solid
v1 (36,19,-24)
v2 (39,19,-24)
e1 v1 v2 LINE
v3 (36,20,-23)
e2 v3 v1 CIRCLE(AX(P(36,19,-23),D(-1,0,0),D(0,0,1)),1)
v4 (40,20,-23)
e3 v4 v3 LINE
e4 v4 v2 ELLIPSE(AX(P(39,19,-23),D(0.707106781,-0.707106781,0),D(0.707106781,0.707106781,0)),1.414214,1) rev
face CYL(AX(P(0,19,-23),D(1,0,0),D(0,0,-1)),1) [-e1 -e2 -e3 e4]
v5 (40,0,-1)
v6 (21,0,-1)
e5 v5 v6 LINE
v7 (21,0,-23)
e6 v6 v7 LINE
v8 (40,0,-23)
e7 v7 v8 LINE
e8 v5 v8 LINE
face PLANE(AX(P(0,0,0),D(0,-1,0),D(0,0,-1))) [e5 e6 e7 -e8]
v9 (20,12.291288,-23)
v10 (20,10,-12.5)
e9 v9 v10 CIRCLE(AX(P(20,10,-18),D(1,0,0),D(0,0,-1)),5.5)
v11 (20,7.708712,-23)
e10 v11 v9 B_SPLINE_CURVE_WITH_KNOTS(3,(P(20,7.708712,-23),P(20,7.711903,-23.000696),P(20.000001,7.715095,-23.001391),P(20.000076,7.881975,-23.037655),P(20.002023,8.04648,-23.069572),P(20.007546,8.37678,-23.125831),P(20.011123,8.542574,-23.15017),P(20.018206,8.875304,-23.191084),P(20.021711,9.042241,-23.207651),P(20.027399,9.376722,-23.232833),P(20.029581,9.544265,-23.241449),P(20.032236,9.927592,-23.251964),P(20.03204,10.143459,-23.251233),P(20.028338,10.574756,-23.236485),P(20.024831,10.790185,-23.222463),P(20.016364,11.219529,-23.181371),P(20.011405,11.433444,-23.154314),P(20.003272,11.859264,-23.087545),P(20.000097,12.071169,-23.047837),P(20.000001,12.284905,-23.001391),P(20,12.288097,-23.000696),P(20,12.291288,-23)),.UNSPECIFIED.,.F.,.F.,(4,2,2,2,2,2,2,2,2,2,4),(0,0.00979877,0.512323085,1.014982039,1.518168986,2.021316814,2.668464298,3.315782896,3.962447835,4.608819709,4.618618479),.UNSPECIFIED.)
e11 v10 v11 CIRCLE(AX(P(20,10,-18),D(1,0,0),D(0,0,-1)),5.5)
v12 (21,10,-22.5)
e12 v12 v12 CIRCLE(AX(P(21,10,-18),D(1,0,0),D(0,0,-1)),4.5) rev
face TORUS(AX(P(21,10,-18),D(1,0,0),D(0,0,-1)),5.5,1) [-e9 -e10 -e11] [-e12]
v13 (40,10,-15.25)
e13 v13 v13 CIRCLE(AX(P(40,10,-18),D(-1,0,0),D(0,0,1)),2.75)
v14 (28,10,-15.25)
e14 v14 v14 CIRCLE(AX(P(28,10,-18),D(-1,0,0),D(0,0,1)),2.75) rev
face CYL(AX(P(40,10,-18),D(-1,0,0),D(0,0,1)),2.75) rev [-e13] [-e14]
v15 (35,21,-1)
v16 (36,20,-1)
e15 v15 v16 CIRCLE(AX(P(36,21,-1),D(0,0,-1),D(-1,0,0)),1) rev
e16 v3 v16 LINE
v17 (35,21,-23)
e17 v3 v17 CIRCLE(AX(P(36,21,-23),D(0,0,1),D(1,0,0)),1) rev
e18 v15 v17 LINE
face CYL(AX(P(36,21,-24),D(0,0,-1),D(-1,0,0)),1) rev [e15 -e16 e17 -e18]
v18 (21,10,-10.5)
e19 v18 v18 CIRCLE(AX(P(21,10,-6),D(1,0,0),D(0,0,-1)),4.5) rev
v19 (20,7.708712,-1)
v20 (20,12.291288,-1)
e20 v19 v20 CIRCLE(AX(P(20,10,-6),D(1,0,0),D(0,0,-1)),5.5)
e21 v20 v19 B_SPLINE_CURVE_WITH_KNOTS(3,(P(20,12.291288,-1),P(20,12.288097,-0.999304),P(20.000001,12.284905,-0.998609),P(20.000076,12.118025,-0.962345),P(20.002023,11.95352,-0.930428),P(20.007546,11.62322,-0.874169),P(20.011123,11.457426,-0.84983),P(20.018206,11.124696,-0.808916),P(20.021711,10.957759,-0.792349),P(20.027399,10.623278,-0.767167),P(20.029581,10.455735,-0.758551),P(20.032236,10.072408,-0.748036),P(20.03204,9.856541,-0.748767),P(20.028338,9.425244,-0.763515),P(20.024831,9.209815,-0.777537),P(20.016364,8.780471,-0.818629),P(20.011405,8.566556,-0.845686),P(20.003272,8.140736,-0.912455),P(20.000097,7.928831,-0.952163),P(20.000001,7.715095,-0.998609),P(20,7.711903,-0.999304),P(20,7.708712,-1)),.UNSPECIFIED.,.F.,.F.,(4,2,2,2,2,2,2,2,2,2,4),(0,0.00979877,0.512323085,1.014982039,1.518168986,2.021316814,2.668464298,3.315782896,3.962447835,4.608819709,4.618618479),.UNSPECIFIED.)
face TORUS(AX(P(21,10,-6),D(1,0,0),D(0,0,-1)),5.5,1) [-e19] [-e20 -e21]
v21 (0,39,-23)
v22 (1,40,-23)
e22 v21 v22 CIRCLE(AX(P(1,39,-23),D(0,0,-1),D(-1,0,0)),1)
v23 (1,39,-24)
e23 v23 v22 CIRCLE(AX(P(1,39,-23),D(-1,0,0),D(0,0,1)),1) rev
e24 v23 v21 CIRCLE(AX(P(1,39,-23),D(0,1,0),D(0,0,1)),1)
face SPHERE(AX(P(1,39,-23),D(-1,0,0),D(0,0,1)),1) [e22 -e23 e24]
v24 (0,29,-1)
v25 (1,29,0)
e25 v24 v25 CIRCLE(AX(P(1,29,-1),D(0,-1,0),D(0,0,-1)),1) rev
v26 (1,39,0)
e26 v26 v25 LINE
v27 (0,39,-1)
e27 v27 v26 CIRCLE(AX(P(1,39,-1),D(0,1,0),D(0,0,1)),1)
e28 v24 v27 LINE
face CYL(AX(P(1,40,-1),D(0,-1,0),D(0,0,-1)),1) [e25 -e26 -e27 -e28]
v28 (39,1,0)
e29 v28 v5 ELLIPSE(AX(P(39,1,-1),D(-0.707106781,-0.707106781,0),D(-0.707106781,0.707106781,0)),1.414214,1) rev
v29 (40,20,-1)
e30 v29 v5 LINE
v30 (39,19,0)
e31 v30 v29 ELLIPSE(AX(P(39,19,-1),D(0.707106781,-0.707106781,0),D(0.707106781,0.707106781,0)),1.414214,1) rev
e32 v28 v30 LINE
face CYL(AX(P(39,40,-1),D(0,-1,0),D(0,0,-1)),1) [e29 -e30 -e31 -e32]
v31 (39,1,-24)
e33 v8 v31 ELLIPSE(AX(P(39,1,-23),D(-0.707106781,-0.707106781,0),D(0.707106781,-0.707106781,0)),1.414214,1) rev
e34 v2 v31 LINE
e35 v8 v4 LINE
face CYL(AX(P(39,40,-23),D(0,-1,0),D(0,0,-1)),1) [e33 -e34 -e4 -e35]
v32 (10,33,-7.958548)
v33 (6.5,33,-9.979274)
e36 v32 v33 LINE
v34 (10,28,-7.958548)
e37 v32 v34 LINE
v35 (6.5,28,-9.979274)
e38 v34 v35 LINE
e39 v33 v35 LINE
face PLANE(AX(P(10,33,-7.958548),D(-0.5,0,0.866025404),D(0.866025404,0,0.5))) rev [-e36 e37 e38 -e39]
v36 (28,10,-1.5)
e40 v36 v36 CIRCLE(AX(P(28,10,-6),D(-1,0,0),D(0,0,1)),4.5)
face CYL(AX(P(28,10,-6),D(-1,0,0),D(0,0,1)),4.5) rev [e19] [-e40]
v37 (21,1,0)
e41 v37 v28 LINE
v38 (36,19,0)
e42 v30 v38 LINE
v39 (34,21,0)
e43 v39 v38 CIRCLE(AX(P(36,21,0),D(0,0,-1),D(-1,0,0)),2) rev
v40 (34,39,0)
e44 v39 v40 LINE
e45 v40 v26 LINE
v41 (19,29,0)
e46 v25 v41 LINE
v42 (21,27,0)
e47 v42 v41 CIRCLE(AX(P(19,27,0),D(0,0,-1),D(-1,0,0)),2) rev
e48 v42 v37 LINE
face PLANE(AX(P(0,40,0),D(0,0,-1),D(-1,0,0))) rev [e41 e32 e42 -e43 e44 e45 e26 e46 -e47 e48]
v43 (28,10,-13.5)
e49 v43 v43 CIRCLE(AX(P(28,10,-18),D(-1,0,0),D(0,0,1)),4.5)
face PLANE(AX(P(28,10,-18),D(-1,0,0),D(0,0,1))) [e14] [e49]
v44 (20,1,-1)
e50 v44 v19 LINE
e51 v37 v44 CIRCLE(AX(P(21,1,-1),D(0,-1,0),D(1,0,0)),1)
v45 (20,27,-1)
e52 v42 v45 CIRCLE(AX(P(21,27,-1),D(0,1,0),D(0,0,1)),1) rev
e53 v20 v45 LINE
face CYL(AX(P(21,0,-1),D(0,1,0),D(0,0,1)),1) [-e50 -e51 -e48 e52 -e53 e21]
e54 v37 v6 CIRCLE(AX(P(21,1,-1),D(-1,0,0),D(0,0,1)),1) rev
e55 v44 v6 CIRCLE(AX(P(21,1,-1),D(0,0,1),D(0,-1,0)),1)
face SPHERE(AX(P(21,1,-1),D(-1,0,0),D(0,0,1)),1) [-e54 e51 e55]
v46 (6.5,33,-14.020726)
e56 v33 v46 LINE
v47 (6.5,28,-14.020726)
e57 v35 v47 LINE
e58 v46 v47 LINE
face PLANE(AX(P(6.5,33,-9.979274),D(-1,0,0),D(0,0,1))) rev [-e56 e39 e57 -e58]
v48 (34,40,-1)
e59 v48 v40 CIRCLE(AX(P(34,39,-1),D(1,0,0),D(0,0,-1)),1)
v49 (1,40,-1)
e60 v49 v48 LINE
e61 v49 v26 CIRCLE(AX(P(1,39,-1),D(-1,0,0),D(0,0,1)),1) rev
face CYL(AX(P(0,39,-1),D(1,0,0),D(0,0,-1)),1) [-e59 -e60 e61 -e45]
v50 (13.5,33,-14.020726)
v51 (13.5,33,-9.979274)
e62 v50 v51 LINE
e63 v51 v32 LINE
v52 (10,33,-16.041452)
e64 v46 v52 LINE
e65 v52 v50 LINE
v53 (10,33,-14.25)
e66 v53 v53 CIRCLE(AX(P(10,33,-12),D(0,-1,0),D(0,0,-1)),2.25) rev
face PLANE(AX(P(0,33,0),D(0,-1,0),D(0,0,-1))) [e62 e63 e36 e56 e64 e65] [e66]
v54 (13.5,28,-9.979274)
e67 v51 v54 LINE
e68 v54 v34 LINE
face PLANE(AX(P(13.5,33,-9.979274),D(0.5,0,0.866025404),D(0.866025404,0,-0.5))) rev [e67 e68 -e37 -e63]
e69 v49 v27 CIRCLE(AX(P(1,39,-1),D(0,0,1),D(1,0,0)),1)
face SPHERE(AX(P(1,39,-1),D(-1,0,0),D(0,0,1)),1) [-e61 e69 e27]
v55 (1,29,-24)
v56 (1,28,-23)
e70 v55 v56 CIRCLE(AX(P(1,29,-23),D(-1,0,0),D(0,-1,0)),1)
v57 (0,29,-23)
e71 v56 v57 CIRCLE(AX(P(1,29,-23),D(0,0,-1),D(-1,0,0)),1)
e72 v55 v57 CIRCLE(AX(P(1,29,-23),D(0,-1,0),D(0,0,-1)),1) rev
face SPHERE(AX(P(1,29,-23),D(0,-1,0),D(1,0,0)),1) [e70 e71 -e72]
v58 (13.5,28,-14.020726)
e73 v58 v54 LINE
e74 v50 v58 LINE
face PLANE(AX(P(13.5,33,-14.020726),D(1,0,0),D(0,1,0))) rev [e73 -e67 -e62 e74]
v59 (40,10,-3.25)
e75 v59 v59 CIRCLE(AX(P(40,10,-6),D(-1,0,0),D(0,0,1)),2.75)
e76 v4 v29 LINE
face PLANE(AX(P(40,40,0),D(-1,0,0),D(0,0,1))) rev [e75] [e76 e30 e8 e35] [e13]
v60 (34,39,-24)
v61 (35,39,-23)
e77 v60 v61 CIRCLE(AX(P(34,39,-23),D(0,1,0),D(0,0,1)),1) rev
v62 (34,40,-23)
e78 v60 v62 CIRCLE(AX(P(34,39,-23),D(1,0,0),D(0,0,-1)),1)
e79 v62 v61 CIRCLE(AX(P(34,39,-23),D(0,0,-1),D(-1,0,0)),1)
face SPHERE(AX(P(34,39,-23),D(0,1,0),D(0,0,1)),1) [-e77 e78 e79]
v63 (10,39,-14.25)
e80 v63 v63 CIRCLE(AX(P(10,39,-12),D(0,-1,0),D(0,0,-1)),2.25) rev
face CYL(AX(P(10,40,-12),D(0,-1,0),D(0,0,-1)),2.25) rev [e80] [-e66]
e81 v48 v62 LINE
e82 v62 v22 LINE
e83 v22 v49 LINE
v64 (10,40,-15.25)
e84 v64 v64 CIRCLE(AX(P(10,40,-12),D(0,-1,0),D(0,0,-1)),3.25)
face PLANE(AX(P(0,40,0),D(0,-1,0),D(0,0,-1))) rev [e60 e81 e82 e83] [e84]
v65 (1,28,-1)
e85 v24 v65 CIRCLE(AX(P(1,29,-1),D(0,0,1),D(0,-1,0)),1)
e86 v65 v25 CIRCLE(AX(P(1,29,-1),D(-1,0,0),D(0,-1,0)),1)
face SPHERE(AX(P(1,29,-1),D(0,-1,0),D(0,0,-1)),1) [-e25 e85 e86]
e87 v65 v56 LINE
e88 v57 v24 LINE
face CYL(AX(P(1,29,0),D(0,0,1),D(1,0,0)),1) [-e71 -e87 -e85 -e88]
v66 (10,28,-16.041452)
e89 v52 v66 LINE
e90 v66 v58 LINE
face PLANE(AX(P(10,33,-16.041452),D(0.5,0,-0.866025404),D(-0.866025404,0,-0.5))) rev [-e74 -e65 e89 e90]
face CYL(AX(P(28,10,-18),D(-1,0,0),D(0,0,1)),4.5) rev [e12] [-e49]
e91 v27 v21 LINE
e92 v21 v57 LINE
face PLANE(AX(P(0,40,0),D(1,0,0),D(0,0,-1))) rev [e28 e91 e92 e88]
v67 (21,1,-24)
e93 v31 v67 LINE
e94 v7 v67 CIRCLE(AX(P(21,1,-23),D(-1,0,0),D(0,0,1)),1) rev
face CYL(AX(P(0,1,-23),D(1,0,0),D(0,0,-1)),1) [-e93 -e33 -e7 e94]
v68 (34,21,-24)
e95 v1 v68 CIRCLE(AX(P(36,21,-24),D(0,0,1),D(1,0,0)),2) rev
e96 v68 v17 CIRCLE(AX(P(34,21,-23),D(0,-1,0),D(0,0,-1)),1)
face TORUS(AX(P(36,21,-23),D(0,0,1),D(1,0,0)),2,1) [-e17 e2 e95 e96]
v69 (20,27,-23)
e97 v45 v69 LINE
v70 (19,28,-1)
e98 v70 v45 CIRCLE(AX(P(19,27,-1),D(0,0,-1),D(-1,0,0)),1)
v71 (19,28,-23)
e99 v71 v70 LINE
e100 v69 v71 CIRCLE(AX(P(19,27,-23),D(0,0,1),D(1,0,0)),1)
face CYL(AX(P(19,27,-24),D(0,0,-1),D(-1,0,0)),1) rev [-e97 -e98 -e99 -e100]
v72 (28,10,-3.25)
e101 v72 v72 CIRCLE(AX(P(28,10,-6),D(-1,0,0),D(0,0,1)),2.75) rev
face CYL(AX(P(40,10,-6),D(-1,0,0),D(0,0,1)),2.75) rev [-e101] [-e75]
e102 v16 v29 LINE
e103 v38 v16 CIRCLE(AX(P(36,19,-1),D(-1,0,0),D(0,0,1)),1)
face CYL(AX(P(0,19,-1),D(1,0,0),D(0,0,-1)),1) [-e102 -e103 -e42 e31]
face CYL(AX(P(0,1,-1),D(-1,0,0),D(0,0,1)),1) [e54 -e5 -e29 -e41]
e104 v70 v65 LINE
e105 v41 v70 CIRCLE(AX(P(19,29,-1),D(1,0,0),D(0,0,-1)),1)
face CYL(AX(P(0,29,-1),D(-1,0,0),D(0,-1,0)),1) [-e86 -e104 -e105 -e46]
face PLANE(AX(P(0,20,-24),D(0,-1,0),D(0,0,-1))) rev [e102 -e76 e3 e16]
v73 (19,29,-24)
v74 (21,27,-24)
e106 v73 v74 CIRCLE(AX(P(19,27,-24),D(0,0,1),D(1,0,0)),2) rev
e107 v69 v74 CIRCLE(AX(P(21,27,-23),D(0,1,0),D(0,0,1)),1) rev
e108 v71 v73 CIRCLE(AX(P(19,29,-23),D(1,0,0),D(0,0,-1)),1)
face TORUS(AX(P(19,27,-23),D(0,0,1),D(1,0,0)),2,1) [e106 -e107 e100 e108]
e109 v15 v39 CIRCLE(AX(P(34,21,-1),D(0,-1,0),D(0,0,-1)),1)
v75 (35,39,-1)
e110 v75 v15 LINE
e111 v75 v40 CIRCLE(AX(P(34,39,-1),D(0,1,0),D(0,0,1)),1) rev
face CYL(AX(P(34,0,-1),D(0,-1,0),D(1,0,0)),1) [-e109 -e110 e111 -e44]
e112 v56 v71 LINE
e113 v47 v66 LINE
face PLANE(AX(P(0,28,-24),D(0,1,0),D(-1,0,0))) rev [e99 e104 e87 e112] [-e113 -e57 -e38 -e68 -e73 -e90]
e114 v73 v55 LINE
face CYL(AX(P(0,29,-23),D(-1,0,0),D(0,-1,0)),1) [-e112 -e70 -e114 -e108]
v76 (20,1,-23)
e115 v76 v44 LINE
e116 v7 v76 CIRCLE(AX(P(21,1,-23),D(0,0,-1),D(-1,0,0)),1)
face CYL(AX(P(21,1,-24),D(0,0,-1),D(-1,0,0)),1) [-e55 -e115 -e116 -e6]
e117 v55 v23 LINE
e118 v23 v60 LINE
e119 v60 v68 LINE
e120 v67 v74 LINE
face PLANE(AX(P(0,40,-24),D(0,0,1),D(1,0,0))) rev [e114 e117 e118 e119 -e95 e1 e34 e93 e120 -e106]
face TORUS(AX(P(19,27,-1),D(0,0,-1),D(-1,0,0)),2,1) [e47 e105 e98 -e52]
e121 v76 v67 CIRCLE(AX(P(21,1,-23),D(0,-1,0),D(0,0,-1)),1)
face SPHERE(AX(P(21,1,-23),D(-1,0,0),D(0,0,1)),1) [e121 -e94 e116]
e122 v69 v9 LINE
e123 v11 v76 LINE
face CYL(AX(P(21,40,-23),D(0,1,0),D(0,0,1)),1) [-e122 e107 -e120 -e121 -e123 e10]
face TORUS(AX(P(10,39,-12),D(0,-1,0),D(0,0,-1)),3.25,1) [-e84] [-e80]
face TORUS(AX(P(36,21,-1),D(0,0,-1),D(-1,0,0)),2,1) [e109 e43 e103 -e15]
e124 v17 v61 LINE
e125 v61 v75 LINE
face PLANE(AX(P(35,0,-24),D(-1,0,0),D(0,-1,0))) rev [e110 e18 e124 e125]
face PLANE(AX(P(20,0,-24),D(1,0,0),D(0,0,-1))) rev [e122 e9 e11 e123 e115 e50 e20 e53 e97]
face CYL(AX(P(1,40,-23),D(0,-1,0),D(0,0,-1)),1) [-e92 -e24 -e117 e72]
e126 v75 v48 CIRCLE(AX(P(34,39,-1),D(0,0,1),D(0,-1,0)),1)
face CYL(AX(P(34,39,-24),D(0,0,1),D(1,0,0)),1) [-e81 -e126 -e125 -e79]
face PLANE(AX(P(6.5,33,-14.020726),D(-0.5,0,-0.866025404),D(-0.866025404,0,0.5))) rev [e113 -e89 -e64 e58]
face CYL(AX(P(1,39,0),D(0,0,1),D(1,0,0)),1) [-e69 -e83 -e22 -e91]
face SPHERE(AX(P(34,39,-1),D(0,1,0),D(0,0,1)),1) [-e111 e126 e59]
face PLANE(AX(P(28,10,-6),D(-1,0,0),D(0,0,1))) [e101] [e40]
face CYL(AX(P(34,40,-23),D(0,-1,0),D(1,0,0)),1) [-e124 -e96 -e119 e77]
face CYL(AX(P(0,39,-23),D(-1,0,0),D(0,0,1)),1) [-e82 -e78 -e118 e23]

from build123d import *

# Parameters (mm, degrees)
SKETCH4_W           = 40
SKETCH4_H           = 24
BOSS_EXTRUDE2_DEPTH = 40
SKETCH6_W           = 5
SKETCH6_H           = 20
SKETCH6_W_2         = 20
SKETCH6_H_2         = 28
CUT_EXTRUDE1_DEPTH  = 62.449165983
SKETCH7_R           = 2.25
CUT_EXTRUDE2_DEPTH  = 55.405882035
SKETCH10_R          = 2.75
CUT_EXTRUDE4_DEPTH  = 51.754310162
SKETCH12_R          = 4.5
CUT_EXTRUDE5_DEPTH  = 8
FILLET1_R           = 1
CUT_EXTRUDE7_DEPTH  = 5


with BuildPart() as part:
    # Sketch4 → Boss-Extrude2 (new body)
    with BuildSketch(Plane(origin=(0, 0, 0), x_dir=(1, 0, 0), z_dir=(0, 1, 0))):
        with Locations((20, 12)):
            Rectangle(SKETCH4_W, SKETCH4_H)
    extrude(amount=BOSS_EXTRUDE2_DEPTH)

    # Sketch6 → Cut-Extrude1 (cut, through all)
    with BuildSketch(Plane.XY):
        with Locations((37.5, 30)):
            Rectangle(SKETCH6_W, SKETCH6_H)
        with Locations((10, 14)):
            Rectangle(SKETCH6_W_2, SKETCH6_H_2)
    extrude(amount=-CUT_EXTRUDE1_DEPTH, mode=Mode.SUBTRACT)

    # Sketch7 → Cut-Extrude2 (cut, through all)
    with BuildSketch(Plane(origin=(0, 28, 0), x_dir=(-1, 0, 0), z_dir=(0, -1, 0))):
        with Locations(Location((-10, 12, 0), (0, 0, 90))):
            Circle(SKETCH7_R)
    extrude(amount=-CUT_EXTRUDE2_DEPTH, mode=Mode.SUBTRACT)

    # Sketch10 → Cut-Extrude4 (cut, through all)
    with BuildSketch(Plane.ZY.offset(-20)):
        with Locations((-18, 10)):
            Circle(SKETCH10_R)
        with Locations((-6, 10)):
            Circle(SKETCH10_R)
    extrude(amount=-CUT_EXTRUDE4_DEPTH, mode=Mode.SUBTRACT)

    # Sketch12 → Cut-Extrude5 (cut)
    with BuildSketch(Plane.ZY.offset(-20)):
        with Locations((-18, 10)):
            Circle(SKETCH12_R)
        with Locations((-6, 10)):
            Circle(SKETCH12_R)
    extrude(amount=-CUT_EXTRUDE5_DEPTH, mode=Mode.SUBTRACT)

    # Fillet1
    # the kernel refuses this fillet: 1 mm, written as the material it adds along each edge
    with BuildSketch(Plane(origin=(35, 20, 0), x_dir=(1, 0, 0), z_dir=(0, 0, -1)), Plane(origin=(20, 28, 0), x_dir=(-1, 0, 0), z_dir=(0, 0, -1))) as fillet1_piece_1:
        with BuildLine():
            CenterArc((FILLET1_R, -FILLET1_R), FILLET1_R, 90, 90)
            Line((0, -FILLET1_R), (0, 0))
            Line((0, 0), (FILLET1_R, 0))
        make_face()
    extrude(amount=24)
    # the kernel refuses this fillet: 1 mm, written as the material it takes off along each edge
    with BuildSketch(Plane(origin=(21, 1, -1), x_dir=(-1, 0, 0), z_dir=(0, 0, 1))) as fillet1_2_piece_1_section:
        Polygon((0, 0), (FILLET1_R, 0), (FILLET1_R, FILLET1_R), (0, FILLET1_R), align=None)
    fillet1_2_piece_1 = extrude(amount=FILLET1_R, mode=Mode.PRIVATE)
    fillet1_2_piece_1 = fillet1_2_piece_1 - Plane(origin=(21, 1, -1), x_dir=(0.7071067811865475, 0.7071067811865475, 0), z_dir=(0, 0, 1)) * Sphere(FILLET1_R, mode=Mode.PRIVATE)
    add(fillet1_2_piece_1, mode=Mode.SUBTRACT)
    with BuildSketch(Plane(origin=(34, 39, -23), x_dir=(1, 0, 0), z_dir=(0, 0, -1))) as fillet1_2_piece_2_section:
        Polygon((0, 0), (FILLET1_R, 0), (FILLET1_R, -FILLET1_R), (0, -FILLET1_R), align=None)
    fillet1_2_piece_2 = extrude(amount=FILLET1_R, mode=Mode.PRIVATE)
    fillet1_2_piece_2 = fillet1_2_piece_2 - Plane(origin=(34, 39, -23), x_dir=(-0.7071067811865474, -0.7071067811865477, 0), z_dir=(0, 0, -1)) * Sphere(FILLET1_R, mode=Mode.PRIVATE)
    add(fillet1_2_piece_2, mode=Mode.SUBTRACT)
    with BuildSketch(Plane(origin=(1, 39, -23), x_dir=(0, 0, -1), z_dir=(-1, 0, 0))) as fillet1_2_piece_3_section:
        Polygon((0, 0), (FILLET1_R, 0), (FILLET1_R, -FILLET1_R), (0, -FILLET1_R), align=None)
    fillet1_2_piece_3 = extrude(amount=FILLET1_R, mode=Mode.PRIVATE)
    fillet1_2_piece_3 = fillet1_2_piece_3 - Plane(origin=(1, 39, -23), x_dir=(0, -0.7071067811865475, 0.7071067811865475), z_dir=(-1, 0, 0)) * Sphere(FILLET1_R, mode=Mode.PRIVATE)
    add(fillet1_2_piece_3, mode=Mode.SUBTRACT)
    with BuildSketch(Plane(origin=(34, 39, -1), x_dir=(1, 0, 0), z_dir=(0, 0, 1))) as fillet1_2_piece_4_section:
        Polygon((0, 0), (FILLET1_R, 0), (FILLET1_R, FILLET1_R), (0, FILLET1_R), align=None)
    fillet1_2_piece_4 = extrude(amount=FILLET1_R, mode=Mode.PRIVATE)
    fillet1_2_piece_4 = fillet1_2_piece_4 - Plane(origin=(34, 39, -1), x_dir=(-0.7071067811865474, -0.7071067811865477, 0), z_dir=(0, 0, 1)) * Sphere(FILLET1_R, mode=Mode.PRIVATE)
    add(fillet1_2_piece_4, mode=Mode.SUBTRACT)
    with BuildSketch(Plane(origin=(21, 1, -23), x_dir=(-1, 0, 0), z_dir=(0, -1, 0))) as fillet1_2_piece_5_section:
        Polygon((0, 0), (FILLET1_R, 0), (FILLET1_R, FILLET1_R), (0, FILLET1_R), align=None)
    fillet1_2_piece_5 = extrude(amount=FILLET1_R, mode=Mode.PRIVATE)
    fillet1_2_piece_5 = fillet1_2_piece_5 - Plane(origin=(21, 1, -23), x_dir=(0.7071067811865475, 0, 0.7071067811865475), z_dir=(0, -1, 0)) * Sphere(FILLET1_R, mode=Mode.PRIVATE)
    add(fillet1_2_piece_5, mode=Mode.SUBTRACT)
    with BuildSketch(Plane(origin=(1, 29, -23), x_dir=(0, -1, 0), z_dir=(-1, 0, 0))) as fillet1_2_piece_6_section:
        Polygon((0, 0), (FILLET1_R, 0), (FILLET1_R, -FILLET1_R), (0, -FILLET1_R), align=None)
    fillet1_2_piece_6 = extrude(amount=FILLET1_R, mode=Mode.PRIVATE)
    fillet1_2_piece_6 = fillet1_2_piece_6 - Plane(origin=(1, 29, -23), x_dir=(0, 0.7071067811865475, 0.7071067811865475), z_dir=(-1, 0, 0)) * Sphere(FILLET1_R, mode=Mode.PRIVATE)
    add(fillet1_2_piece_6, mode=Mode.SUBTRACT)
    with BuildSketch(Plane(origin=(1, 29, -1), x_dir=(0, -1, 0), z_dir=(-1, 0, 0))) as fillet1_2_piece_7_section:
        Polygon((0, 0), (FILLET1_R, 0), (FILLET1_R, FILLET1_R), (0, FILLET1_R), align=None)
    fillet1_2_piece_7 = extrude(amount=FILLET1_R, mode=Mode.PRIVATE)
    fillet1_2_piece_7 = fillet1_2_piece_7 - Plane(origin=(1, 29, -1), x_dir=(0, 0.7071067811865475, -0.7071067811865475), z_dir=(-1, 0, 0)) * Sphere(FILLET1_R, mode=Mode.PRIVATE)
    add(fillet1_2_piece_7, mode=Mode.SUBTRACT)
    with BuildSketch(Plane(origin=(1, 39, -1), x_dir=(0, 0, 1), z_dir=(-1, 0, 0))) as fillet1_2_piece_8_section:
        Polygon((0, 0), (FILLET1_R, 0), (FILLET1_R, FILLET1_R), (0, FILLET1_R), align=None)
    fillet1_2_piece_8 = extrude(amount=FILLET1_R, mode=Mode.PRIVATE)
    fillet1_2_piece_8 = fillet1_2_piece_8 - Plane(origin=(1, 39, -1), x_dir=(0, -0.7071067811865475, -0.7071067811865475), z_dir=(-1, 0, 0)) * Sphere(FILLET1_R, mode=Mode.PRIVATE)
    add(fillet1_2_piece_8, mode=Mode.SUBTRACT)
    with BuildSketch(Plane(origin=(21, 0, 0), x_dir=(0, 1, 0), z_dir=(1, 0, 0))) as fillet1_2_piece_9:
        with BuildLine():
            CenterArc((FILLET1_R, -FILLET1_R), FILLET1_R, 90, 90)
            Line((0, -FILLET1_R), (0, 0))
            Line((0, 0), (FILLET1_R, 0))
        make_face()
    extrude(amount=21.5, mode=Mode.SUBTRACT)
    with BuildSketch(Plane(origin=(34, 40, -24), x_dir=(0, 0, 1), z_dir=(-1, 0, 0))) as fillet1_2_piece_10:
        with BuildLine():
            CenterArc((FILLET1_R, -FILLET1_R), FILLET1_R, 90, 90)
            Line((0, -FILLET1_R), (0, 0))
            Line((0, 0), (FILLET1_R, 0))
        make_face()
    extrude(amount=33, mode=Mode.SUBTRACT)
    with BuildSketch(Plane(origin=(40, -2.5, -24), x_dir=(0, 0, 1), z_dir=(0, 1, 0)), Plane(origin=(40, -2.5, 0), x_dir=(-1, 0, 0), z_dir=(0, 1, 0))) as fillet1_2_piece_11:
        with BuildLine():
            CenterArc((FILLET1_R, -FILLET1_R), FILLET1_R, 90, 90)
            Line((0, -FILLET1_R), (0, 0))
            Line((0, 0), (FILLET1_R, 0))
        make_face()
    extrude(amount=25, mode=Mode.SUBTRACT)
    with BuildSketch(Plane(origin=(35, 39, -24), x_dir=(0, 0, 1), z_dir=(0, -1, 0)), Plane(origin=(35, 39, 0), x_dir=(-1, 0, 0), z_dir=(0, -1, 0)), Plane(origin=(19, 28, -24), x_dir=(0, 0, 1), z_dir=(-1, 0, 0)), Plane(origin=(19, 28, 0), x_dir=(0, 1, 0), z_dir=(-1, 0, 0))) as fillet1_2_piece_12:
        with BuildLine():
            CenterArc((FILLET1_R, FILLET1_R), FILLET1_R, 180, 90)
            Line((0, FILLET1_R), (0, 0))
            Line((0, 0), (FILLET1_R, 0))
        make_face()
    extrude(amount=18, mode=Mode.SUBTRACT)
    with BuildSketch(Plane(origin=(35, 40, -1), x_dir=(0, -1, 0), z_dir=(0, 0, -1)), Plane(origin=(20, 0, -1), x_dir=(0, 1, 0), z_dir=(0, 0, -1))) as fillet1_2_piece_13:
        with BuildLine():
            CenterArc((FILLET1_R, FILLET1_R), FILLET1_R, 180, 90)
            Line((0, FILLET1_R), (0, 0))
            Line((0, 0), (FILLET1_R, 0))
        make_face()
    extrude(amount=22, mode=Mode.SUBTRACT)
    with BuildSketch(Plane(origin=(36, 20, -24), x_dir=(0, 0, 1), z_dir=(1, 0, 0)), Plane(origin=(36, 20, 0), x_dir=(0, -1, 0), z_dir=(1, 0, 0))) as fillet1_2_piece_14:
        with BuildLine():
            CenterArc((FILLET1_R, FILLET1_R), FILLET1_R, 180, 90)
            Line((0, FILLET1_R), (0, 0))
            Line((0, 0), (FILLET1_R, 0))
        make_face()
    extrude(amount=6.5, mode=Mode.SUBTRACT)
    with BuildSketch(Plane(origin=(20, 1, -24), x_dir=(0, 0, 1), z_dir=(0, 1, 0)), Plane(origin=(20, 1, 0), x_dir=(1, 0, 0), z_dir=(0, 1, 0))) as fillet1_2_piece_15:
        with BuildLine():
            CenterArc((FILLET1_R, FILLET1_R), FILLET1_R, 180, 90)
            Line((0, FILLET1_R), (0, 0))
            Line((0, 0), (FILLET1_R, 0))
        make_face()
    extrude(amount=26, mode=Mode.SUBTRACT)
    with BuildSketch(Plane(origin=(0, 28, -1), x_dir=(1, 0, 0), z_dir=(0, 0, -1)), Plane(origin=(0, 40, -23), x_dir=(1, 0, 0), z_dir=(0, 0, 1))) as fillet1_2_piece_16:
        with BuildLine():
            CenterArc((FILLET1_R, -FILLET1_R), FILLET1_R, 90, 90)
            Line((0, -FILLET1_R), (0, 0))
            Line((0, 0), (FILLET1_R, 0))
        make_face()
    extrude(amount=22, mode=Mode.SUBTRACT)
    with BuildSketch(Plane(origin=(10, 40, -12), x_dir=(0, 0, -1), z_dir=(-1, 0, 0))) as fillet1_2_piece_17:
        with BuildLine():
            CenterArc((2.25 + FILLET1_R, FILLET1_R), FILLET1_R, 180, 90)
            Line((2.25, FILLET1_R), (2.25, 0))
            Line((2.25, 0), (2.25 + FILLET1_R, 0))
        make_face()
    revolve(axis=Axis((10, 40, -12), (0, -1, 0)), mode=Mode.SUBTRACT)
    with BuildSketch(Plane(origin=(42.5, 0, -24), x_dir=(0, 0, 1), z_dir=(-1, 0, 0))) as fillet1_2_piece_18:
        with BuildLine():
            CenterArc((FILLET1_R, FILLET1_R), FILLET1_R, 180, 90)
            Line((0, FILLET1_R), (0, 0))
            Line((0, 0), (FILLET1_R, 0))
        make_face()
    extrude(amount=21.5, mode=Mode.SUBTRACT)
    with BuildSketch(Plane(origin=(20, 10, -18), x_dir=(0, 0, 1), z_dir=(0, -1, 0))) as fillet1_2_piece_19:
        with BuildLine():
            CenterArc((4.5 + FILLET1_R, -FILLET1_R), FILLET1_R, 90, 90)
            Line((4.5, -FILLET1_R), (4.5, 0))
            Line((4.5, 0), (4.5 + FILLET1_R, 0))
        make_face()
    revolve(axis=Axis((20, 10, -18), (-1, 0, 0)), mode=Mode.SUBTRACT)
    with BuildSketch(Plane(origin=(20, 10, -6), x_dir=(0, 0, 1), z_dir=(0, -1, 0))) as fillet1_2_piece_20:
        with BuildLine():
            CenterArc((4.5 + FILLET1_R, -FILLET1_R), FILLET1_R, 90, 90)
            Line((4.5, -FILLET1_R), (4.5, 0))
            Line((4.5, 0), (4.5 + FILLET1_R, 0))
        make_face()
    revolve(axis=Axis((20, 10, -6), (-1, 0, 0)), mode=Mode.SUBTRACT)
    with BuildSketch(Plane(origin=(0, 29, -24), x_dir=(0, 0, 1), z_dir=(0, 1, 0)), Plane(origin=(0, 29, 0), x_dir=(1, 0, 0), z_dir=(0, 1, 0))) as fillet1_2_piece_21:
        with BuildLine():
            CenterArc((FILLET1_R, FILLET1_R), FILLET1_R, 180, 90)
            Line((0, FILLET1_R), (0, 0))
            Line((0, 0), (FILLET1_R, 0))
        make_face()
    extrude(amount=10, mode=Mode.SUBTRACT)
    with BuildSketch(Plane(origin=(1, 40, 0), x_dir=(0, -1, 0), z_dir=(1, 0, 0))) as fillet1_2_piece_22:
        with BuildLine():
            CenterArc((FILLET1_R, FILLET1_R), FILLET1_R, 180, 90)
            Line((0, FILLET1_R), (0, 0))
            Line((0, 0), (FILLET1_R, 0))
        make_face()
    extrude(amount=33, mode=Mode.SUBTRACT)
    with BuildSketch(Plane(origin=(19, 27, 0), x_dir=(0, 1, 0), z_dir=(-1, 0, 0))) as fillet1_2_piece_23:
        with BuildLine():
            CenterArc((1 + FILLET1_R, FILLET1_R), FILLET1_R, 180, 90)
            Line((1, FILLET1_R), (1, 0))
            Line((1, 0), (1 + FILLET1_R, 0))
        make_face()
    revolve(axis=Axis((19, 27, 0), (0, 0, -1)), revolution_arc=90, mode=Mode.SUBTRACT)
    with BuildSketch(Plane(origin=(19, 27, -24), x_dir=(0, 1, 0), z_dir=(-1, 0, 0))) as fillet1_2_piece_24:
        with BuildLine():
            CenterArc((1 + FILLET1_R, -FILLET1_R), FILLET1_R, 90, 90)
            Line((1 + FILLET1_R, 0), (1, 0))
            Line((1, 0), (1, -FILLET1_R))
        make_face()
    revolve(axis=Axis((19, 27, -24), (0, 0, -1)), revolution_arc=90, mode=Mode.SUBTRACT)
    with BuildSketch(Plane(origin=(36, 21, 0), x_dir=(0, -1, 0), z_dir=(1, 0, 0))) as fillet1_2_piece_25:
        with BuildLine():
            CenterArc((1 + FILLET1_R, FILLET1_R), FILLET1_R, 180, 90)
            Line((1, FILLET1_R), (1, 0))
            Line((1, 0), (1 + FILLET1_R, 0))
        make_face()
    revolve(axis=Axis((36, 21, 0), (0, 0, -1)), revolution_arc=90, mode=Mode.SUBTRACT)
    with BuildSketch(Plane(origin=(36, 21, -24), x_dir=(0, -1, 0), z_dir=(1, 0, 0))) as fillet1_2_piece_26:
        with BuildLine():
            CenterArc((1 + FILLET1_R, -FILLET1_R), FILLET1_R, 90, 90)
            Line((1, -FILLET1_R), (1, 0))
            Line((1, 0), (1 + FILLET1_R, 0))
        make_face()
    revolve(axis=Axis((36, 21, -24), (0, 0, -1)), revolution_arc=90, mode=Mode.SUBTRACT)

    # Sketch14 → Cut-Extrude7 (cut)
    with BuildSketch(Plane.XZ.offset(-28)):
        Polygon((6.5, -14.020725942), (10, -16.041451884), (13.5, -14.020725942), (13.5, -9.979274058), (10, -7.958548116), (6.5, -9.979274058), align=None)
    extrude(amount=-CUT_EXTRUDE7_DEPTH, mode=Mode.SUBTRACT)


solid = part.part
